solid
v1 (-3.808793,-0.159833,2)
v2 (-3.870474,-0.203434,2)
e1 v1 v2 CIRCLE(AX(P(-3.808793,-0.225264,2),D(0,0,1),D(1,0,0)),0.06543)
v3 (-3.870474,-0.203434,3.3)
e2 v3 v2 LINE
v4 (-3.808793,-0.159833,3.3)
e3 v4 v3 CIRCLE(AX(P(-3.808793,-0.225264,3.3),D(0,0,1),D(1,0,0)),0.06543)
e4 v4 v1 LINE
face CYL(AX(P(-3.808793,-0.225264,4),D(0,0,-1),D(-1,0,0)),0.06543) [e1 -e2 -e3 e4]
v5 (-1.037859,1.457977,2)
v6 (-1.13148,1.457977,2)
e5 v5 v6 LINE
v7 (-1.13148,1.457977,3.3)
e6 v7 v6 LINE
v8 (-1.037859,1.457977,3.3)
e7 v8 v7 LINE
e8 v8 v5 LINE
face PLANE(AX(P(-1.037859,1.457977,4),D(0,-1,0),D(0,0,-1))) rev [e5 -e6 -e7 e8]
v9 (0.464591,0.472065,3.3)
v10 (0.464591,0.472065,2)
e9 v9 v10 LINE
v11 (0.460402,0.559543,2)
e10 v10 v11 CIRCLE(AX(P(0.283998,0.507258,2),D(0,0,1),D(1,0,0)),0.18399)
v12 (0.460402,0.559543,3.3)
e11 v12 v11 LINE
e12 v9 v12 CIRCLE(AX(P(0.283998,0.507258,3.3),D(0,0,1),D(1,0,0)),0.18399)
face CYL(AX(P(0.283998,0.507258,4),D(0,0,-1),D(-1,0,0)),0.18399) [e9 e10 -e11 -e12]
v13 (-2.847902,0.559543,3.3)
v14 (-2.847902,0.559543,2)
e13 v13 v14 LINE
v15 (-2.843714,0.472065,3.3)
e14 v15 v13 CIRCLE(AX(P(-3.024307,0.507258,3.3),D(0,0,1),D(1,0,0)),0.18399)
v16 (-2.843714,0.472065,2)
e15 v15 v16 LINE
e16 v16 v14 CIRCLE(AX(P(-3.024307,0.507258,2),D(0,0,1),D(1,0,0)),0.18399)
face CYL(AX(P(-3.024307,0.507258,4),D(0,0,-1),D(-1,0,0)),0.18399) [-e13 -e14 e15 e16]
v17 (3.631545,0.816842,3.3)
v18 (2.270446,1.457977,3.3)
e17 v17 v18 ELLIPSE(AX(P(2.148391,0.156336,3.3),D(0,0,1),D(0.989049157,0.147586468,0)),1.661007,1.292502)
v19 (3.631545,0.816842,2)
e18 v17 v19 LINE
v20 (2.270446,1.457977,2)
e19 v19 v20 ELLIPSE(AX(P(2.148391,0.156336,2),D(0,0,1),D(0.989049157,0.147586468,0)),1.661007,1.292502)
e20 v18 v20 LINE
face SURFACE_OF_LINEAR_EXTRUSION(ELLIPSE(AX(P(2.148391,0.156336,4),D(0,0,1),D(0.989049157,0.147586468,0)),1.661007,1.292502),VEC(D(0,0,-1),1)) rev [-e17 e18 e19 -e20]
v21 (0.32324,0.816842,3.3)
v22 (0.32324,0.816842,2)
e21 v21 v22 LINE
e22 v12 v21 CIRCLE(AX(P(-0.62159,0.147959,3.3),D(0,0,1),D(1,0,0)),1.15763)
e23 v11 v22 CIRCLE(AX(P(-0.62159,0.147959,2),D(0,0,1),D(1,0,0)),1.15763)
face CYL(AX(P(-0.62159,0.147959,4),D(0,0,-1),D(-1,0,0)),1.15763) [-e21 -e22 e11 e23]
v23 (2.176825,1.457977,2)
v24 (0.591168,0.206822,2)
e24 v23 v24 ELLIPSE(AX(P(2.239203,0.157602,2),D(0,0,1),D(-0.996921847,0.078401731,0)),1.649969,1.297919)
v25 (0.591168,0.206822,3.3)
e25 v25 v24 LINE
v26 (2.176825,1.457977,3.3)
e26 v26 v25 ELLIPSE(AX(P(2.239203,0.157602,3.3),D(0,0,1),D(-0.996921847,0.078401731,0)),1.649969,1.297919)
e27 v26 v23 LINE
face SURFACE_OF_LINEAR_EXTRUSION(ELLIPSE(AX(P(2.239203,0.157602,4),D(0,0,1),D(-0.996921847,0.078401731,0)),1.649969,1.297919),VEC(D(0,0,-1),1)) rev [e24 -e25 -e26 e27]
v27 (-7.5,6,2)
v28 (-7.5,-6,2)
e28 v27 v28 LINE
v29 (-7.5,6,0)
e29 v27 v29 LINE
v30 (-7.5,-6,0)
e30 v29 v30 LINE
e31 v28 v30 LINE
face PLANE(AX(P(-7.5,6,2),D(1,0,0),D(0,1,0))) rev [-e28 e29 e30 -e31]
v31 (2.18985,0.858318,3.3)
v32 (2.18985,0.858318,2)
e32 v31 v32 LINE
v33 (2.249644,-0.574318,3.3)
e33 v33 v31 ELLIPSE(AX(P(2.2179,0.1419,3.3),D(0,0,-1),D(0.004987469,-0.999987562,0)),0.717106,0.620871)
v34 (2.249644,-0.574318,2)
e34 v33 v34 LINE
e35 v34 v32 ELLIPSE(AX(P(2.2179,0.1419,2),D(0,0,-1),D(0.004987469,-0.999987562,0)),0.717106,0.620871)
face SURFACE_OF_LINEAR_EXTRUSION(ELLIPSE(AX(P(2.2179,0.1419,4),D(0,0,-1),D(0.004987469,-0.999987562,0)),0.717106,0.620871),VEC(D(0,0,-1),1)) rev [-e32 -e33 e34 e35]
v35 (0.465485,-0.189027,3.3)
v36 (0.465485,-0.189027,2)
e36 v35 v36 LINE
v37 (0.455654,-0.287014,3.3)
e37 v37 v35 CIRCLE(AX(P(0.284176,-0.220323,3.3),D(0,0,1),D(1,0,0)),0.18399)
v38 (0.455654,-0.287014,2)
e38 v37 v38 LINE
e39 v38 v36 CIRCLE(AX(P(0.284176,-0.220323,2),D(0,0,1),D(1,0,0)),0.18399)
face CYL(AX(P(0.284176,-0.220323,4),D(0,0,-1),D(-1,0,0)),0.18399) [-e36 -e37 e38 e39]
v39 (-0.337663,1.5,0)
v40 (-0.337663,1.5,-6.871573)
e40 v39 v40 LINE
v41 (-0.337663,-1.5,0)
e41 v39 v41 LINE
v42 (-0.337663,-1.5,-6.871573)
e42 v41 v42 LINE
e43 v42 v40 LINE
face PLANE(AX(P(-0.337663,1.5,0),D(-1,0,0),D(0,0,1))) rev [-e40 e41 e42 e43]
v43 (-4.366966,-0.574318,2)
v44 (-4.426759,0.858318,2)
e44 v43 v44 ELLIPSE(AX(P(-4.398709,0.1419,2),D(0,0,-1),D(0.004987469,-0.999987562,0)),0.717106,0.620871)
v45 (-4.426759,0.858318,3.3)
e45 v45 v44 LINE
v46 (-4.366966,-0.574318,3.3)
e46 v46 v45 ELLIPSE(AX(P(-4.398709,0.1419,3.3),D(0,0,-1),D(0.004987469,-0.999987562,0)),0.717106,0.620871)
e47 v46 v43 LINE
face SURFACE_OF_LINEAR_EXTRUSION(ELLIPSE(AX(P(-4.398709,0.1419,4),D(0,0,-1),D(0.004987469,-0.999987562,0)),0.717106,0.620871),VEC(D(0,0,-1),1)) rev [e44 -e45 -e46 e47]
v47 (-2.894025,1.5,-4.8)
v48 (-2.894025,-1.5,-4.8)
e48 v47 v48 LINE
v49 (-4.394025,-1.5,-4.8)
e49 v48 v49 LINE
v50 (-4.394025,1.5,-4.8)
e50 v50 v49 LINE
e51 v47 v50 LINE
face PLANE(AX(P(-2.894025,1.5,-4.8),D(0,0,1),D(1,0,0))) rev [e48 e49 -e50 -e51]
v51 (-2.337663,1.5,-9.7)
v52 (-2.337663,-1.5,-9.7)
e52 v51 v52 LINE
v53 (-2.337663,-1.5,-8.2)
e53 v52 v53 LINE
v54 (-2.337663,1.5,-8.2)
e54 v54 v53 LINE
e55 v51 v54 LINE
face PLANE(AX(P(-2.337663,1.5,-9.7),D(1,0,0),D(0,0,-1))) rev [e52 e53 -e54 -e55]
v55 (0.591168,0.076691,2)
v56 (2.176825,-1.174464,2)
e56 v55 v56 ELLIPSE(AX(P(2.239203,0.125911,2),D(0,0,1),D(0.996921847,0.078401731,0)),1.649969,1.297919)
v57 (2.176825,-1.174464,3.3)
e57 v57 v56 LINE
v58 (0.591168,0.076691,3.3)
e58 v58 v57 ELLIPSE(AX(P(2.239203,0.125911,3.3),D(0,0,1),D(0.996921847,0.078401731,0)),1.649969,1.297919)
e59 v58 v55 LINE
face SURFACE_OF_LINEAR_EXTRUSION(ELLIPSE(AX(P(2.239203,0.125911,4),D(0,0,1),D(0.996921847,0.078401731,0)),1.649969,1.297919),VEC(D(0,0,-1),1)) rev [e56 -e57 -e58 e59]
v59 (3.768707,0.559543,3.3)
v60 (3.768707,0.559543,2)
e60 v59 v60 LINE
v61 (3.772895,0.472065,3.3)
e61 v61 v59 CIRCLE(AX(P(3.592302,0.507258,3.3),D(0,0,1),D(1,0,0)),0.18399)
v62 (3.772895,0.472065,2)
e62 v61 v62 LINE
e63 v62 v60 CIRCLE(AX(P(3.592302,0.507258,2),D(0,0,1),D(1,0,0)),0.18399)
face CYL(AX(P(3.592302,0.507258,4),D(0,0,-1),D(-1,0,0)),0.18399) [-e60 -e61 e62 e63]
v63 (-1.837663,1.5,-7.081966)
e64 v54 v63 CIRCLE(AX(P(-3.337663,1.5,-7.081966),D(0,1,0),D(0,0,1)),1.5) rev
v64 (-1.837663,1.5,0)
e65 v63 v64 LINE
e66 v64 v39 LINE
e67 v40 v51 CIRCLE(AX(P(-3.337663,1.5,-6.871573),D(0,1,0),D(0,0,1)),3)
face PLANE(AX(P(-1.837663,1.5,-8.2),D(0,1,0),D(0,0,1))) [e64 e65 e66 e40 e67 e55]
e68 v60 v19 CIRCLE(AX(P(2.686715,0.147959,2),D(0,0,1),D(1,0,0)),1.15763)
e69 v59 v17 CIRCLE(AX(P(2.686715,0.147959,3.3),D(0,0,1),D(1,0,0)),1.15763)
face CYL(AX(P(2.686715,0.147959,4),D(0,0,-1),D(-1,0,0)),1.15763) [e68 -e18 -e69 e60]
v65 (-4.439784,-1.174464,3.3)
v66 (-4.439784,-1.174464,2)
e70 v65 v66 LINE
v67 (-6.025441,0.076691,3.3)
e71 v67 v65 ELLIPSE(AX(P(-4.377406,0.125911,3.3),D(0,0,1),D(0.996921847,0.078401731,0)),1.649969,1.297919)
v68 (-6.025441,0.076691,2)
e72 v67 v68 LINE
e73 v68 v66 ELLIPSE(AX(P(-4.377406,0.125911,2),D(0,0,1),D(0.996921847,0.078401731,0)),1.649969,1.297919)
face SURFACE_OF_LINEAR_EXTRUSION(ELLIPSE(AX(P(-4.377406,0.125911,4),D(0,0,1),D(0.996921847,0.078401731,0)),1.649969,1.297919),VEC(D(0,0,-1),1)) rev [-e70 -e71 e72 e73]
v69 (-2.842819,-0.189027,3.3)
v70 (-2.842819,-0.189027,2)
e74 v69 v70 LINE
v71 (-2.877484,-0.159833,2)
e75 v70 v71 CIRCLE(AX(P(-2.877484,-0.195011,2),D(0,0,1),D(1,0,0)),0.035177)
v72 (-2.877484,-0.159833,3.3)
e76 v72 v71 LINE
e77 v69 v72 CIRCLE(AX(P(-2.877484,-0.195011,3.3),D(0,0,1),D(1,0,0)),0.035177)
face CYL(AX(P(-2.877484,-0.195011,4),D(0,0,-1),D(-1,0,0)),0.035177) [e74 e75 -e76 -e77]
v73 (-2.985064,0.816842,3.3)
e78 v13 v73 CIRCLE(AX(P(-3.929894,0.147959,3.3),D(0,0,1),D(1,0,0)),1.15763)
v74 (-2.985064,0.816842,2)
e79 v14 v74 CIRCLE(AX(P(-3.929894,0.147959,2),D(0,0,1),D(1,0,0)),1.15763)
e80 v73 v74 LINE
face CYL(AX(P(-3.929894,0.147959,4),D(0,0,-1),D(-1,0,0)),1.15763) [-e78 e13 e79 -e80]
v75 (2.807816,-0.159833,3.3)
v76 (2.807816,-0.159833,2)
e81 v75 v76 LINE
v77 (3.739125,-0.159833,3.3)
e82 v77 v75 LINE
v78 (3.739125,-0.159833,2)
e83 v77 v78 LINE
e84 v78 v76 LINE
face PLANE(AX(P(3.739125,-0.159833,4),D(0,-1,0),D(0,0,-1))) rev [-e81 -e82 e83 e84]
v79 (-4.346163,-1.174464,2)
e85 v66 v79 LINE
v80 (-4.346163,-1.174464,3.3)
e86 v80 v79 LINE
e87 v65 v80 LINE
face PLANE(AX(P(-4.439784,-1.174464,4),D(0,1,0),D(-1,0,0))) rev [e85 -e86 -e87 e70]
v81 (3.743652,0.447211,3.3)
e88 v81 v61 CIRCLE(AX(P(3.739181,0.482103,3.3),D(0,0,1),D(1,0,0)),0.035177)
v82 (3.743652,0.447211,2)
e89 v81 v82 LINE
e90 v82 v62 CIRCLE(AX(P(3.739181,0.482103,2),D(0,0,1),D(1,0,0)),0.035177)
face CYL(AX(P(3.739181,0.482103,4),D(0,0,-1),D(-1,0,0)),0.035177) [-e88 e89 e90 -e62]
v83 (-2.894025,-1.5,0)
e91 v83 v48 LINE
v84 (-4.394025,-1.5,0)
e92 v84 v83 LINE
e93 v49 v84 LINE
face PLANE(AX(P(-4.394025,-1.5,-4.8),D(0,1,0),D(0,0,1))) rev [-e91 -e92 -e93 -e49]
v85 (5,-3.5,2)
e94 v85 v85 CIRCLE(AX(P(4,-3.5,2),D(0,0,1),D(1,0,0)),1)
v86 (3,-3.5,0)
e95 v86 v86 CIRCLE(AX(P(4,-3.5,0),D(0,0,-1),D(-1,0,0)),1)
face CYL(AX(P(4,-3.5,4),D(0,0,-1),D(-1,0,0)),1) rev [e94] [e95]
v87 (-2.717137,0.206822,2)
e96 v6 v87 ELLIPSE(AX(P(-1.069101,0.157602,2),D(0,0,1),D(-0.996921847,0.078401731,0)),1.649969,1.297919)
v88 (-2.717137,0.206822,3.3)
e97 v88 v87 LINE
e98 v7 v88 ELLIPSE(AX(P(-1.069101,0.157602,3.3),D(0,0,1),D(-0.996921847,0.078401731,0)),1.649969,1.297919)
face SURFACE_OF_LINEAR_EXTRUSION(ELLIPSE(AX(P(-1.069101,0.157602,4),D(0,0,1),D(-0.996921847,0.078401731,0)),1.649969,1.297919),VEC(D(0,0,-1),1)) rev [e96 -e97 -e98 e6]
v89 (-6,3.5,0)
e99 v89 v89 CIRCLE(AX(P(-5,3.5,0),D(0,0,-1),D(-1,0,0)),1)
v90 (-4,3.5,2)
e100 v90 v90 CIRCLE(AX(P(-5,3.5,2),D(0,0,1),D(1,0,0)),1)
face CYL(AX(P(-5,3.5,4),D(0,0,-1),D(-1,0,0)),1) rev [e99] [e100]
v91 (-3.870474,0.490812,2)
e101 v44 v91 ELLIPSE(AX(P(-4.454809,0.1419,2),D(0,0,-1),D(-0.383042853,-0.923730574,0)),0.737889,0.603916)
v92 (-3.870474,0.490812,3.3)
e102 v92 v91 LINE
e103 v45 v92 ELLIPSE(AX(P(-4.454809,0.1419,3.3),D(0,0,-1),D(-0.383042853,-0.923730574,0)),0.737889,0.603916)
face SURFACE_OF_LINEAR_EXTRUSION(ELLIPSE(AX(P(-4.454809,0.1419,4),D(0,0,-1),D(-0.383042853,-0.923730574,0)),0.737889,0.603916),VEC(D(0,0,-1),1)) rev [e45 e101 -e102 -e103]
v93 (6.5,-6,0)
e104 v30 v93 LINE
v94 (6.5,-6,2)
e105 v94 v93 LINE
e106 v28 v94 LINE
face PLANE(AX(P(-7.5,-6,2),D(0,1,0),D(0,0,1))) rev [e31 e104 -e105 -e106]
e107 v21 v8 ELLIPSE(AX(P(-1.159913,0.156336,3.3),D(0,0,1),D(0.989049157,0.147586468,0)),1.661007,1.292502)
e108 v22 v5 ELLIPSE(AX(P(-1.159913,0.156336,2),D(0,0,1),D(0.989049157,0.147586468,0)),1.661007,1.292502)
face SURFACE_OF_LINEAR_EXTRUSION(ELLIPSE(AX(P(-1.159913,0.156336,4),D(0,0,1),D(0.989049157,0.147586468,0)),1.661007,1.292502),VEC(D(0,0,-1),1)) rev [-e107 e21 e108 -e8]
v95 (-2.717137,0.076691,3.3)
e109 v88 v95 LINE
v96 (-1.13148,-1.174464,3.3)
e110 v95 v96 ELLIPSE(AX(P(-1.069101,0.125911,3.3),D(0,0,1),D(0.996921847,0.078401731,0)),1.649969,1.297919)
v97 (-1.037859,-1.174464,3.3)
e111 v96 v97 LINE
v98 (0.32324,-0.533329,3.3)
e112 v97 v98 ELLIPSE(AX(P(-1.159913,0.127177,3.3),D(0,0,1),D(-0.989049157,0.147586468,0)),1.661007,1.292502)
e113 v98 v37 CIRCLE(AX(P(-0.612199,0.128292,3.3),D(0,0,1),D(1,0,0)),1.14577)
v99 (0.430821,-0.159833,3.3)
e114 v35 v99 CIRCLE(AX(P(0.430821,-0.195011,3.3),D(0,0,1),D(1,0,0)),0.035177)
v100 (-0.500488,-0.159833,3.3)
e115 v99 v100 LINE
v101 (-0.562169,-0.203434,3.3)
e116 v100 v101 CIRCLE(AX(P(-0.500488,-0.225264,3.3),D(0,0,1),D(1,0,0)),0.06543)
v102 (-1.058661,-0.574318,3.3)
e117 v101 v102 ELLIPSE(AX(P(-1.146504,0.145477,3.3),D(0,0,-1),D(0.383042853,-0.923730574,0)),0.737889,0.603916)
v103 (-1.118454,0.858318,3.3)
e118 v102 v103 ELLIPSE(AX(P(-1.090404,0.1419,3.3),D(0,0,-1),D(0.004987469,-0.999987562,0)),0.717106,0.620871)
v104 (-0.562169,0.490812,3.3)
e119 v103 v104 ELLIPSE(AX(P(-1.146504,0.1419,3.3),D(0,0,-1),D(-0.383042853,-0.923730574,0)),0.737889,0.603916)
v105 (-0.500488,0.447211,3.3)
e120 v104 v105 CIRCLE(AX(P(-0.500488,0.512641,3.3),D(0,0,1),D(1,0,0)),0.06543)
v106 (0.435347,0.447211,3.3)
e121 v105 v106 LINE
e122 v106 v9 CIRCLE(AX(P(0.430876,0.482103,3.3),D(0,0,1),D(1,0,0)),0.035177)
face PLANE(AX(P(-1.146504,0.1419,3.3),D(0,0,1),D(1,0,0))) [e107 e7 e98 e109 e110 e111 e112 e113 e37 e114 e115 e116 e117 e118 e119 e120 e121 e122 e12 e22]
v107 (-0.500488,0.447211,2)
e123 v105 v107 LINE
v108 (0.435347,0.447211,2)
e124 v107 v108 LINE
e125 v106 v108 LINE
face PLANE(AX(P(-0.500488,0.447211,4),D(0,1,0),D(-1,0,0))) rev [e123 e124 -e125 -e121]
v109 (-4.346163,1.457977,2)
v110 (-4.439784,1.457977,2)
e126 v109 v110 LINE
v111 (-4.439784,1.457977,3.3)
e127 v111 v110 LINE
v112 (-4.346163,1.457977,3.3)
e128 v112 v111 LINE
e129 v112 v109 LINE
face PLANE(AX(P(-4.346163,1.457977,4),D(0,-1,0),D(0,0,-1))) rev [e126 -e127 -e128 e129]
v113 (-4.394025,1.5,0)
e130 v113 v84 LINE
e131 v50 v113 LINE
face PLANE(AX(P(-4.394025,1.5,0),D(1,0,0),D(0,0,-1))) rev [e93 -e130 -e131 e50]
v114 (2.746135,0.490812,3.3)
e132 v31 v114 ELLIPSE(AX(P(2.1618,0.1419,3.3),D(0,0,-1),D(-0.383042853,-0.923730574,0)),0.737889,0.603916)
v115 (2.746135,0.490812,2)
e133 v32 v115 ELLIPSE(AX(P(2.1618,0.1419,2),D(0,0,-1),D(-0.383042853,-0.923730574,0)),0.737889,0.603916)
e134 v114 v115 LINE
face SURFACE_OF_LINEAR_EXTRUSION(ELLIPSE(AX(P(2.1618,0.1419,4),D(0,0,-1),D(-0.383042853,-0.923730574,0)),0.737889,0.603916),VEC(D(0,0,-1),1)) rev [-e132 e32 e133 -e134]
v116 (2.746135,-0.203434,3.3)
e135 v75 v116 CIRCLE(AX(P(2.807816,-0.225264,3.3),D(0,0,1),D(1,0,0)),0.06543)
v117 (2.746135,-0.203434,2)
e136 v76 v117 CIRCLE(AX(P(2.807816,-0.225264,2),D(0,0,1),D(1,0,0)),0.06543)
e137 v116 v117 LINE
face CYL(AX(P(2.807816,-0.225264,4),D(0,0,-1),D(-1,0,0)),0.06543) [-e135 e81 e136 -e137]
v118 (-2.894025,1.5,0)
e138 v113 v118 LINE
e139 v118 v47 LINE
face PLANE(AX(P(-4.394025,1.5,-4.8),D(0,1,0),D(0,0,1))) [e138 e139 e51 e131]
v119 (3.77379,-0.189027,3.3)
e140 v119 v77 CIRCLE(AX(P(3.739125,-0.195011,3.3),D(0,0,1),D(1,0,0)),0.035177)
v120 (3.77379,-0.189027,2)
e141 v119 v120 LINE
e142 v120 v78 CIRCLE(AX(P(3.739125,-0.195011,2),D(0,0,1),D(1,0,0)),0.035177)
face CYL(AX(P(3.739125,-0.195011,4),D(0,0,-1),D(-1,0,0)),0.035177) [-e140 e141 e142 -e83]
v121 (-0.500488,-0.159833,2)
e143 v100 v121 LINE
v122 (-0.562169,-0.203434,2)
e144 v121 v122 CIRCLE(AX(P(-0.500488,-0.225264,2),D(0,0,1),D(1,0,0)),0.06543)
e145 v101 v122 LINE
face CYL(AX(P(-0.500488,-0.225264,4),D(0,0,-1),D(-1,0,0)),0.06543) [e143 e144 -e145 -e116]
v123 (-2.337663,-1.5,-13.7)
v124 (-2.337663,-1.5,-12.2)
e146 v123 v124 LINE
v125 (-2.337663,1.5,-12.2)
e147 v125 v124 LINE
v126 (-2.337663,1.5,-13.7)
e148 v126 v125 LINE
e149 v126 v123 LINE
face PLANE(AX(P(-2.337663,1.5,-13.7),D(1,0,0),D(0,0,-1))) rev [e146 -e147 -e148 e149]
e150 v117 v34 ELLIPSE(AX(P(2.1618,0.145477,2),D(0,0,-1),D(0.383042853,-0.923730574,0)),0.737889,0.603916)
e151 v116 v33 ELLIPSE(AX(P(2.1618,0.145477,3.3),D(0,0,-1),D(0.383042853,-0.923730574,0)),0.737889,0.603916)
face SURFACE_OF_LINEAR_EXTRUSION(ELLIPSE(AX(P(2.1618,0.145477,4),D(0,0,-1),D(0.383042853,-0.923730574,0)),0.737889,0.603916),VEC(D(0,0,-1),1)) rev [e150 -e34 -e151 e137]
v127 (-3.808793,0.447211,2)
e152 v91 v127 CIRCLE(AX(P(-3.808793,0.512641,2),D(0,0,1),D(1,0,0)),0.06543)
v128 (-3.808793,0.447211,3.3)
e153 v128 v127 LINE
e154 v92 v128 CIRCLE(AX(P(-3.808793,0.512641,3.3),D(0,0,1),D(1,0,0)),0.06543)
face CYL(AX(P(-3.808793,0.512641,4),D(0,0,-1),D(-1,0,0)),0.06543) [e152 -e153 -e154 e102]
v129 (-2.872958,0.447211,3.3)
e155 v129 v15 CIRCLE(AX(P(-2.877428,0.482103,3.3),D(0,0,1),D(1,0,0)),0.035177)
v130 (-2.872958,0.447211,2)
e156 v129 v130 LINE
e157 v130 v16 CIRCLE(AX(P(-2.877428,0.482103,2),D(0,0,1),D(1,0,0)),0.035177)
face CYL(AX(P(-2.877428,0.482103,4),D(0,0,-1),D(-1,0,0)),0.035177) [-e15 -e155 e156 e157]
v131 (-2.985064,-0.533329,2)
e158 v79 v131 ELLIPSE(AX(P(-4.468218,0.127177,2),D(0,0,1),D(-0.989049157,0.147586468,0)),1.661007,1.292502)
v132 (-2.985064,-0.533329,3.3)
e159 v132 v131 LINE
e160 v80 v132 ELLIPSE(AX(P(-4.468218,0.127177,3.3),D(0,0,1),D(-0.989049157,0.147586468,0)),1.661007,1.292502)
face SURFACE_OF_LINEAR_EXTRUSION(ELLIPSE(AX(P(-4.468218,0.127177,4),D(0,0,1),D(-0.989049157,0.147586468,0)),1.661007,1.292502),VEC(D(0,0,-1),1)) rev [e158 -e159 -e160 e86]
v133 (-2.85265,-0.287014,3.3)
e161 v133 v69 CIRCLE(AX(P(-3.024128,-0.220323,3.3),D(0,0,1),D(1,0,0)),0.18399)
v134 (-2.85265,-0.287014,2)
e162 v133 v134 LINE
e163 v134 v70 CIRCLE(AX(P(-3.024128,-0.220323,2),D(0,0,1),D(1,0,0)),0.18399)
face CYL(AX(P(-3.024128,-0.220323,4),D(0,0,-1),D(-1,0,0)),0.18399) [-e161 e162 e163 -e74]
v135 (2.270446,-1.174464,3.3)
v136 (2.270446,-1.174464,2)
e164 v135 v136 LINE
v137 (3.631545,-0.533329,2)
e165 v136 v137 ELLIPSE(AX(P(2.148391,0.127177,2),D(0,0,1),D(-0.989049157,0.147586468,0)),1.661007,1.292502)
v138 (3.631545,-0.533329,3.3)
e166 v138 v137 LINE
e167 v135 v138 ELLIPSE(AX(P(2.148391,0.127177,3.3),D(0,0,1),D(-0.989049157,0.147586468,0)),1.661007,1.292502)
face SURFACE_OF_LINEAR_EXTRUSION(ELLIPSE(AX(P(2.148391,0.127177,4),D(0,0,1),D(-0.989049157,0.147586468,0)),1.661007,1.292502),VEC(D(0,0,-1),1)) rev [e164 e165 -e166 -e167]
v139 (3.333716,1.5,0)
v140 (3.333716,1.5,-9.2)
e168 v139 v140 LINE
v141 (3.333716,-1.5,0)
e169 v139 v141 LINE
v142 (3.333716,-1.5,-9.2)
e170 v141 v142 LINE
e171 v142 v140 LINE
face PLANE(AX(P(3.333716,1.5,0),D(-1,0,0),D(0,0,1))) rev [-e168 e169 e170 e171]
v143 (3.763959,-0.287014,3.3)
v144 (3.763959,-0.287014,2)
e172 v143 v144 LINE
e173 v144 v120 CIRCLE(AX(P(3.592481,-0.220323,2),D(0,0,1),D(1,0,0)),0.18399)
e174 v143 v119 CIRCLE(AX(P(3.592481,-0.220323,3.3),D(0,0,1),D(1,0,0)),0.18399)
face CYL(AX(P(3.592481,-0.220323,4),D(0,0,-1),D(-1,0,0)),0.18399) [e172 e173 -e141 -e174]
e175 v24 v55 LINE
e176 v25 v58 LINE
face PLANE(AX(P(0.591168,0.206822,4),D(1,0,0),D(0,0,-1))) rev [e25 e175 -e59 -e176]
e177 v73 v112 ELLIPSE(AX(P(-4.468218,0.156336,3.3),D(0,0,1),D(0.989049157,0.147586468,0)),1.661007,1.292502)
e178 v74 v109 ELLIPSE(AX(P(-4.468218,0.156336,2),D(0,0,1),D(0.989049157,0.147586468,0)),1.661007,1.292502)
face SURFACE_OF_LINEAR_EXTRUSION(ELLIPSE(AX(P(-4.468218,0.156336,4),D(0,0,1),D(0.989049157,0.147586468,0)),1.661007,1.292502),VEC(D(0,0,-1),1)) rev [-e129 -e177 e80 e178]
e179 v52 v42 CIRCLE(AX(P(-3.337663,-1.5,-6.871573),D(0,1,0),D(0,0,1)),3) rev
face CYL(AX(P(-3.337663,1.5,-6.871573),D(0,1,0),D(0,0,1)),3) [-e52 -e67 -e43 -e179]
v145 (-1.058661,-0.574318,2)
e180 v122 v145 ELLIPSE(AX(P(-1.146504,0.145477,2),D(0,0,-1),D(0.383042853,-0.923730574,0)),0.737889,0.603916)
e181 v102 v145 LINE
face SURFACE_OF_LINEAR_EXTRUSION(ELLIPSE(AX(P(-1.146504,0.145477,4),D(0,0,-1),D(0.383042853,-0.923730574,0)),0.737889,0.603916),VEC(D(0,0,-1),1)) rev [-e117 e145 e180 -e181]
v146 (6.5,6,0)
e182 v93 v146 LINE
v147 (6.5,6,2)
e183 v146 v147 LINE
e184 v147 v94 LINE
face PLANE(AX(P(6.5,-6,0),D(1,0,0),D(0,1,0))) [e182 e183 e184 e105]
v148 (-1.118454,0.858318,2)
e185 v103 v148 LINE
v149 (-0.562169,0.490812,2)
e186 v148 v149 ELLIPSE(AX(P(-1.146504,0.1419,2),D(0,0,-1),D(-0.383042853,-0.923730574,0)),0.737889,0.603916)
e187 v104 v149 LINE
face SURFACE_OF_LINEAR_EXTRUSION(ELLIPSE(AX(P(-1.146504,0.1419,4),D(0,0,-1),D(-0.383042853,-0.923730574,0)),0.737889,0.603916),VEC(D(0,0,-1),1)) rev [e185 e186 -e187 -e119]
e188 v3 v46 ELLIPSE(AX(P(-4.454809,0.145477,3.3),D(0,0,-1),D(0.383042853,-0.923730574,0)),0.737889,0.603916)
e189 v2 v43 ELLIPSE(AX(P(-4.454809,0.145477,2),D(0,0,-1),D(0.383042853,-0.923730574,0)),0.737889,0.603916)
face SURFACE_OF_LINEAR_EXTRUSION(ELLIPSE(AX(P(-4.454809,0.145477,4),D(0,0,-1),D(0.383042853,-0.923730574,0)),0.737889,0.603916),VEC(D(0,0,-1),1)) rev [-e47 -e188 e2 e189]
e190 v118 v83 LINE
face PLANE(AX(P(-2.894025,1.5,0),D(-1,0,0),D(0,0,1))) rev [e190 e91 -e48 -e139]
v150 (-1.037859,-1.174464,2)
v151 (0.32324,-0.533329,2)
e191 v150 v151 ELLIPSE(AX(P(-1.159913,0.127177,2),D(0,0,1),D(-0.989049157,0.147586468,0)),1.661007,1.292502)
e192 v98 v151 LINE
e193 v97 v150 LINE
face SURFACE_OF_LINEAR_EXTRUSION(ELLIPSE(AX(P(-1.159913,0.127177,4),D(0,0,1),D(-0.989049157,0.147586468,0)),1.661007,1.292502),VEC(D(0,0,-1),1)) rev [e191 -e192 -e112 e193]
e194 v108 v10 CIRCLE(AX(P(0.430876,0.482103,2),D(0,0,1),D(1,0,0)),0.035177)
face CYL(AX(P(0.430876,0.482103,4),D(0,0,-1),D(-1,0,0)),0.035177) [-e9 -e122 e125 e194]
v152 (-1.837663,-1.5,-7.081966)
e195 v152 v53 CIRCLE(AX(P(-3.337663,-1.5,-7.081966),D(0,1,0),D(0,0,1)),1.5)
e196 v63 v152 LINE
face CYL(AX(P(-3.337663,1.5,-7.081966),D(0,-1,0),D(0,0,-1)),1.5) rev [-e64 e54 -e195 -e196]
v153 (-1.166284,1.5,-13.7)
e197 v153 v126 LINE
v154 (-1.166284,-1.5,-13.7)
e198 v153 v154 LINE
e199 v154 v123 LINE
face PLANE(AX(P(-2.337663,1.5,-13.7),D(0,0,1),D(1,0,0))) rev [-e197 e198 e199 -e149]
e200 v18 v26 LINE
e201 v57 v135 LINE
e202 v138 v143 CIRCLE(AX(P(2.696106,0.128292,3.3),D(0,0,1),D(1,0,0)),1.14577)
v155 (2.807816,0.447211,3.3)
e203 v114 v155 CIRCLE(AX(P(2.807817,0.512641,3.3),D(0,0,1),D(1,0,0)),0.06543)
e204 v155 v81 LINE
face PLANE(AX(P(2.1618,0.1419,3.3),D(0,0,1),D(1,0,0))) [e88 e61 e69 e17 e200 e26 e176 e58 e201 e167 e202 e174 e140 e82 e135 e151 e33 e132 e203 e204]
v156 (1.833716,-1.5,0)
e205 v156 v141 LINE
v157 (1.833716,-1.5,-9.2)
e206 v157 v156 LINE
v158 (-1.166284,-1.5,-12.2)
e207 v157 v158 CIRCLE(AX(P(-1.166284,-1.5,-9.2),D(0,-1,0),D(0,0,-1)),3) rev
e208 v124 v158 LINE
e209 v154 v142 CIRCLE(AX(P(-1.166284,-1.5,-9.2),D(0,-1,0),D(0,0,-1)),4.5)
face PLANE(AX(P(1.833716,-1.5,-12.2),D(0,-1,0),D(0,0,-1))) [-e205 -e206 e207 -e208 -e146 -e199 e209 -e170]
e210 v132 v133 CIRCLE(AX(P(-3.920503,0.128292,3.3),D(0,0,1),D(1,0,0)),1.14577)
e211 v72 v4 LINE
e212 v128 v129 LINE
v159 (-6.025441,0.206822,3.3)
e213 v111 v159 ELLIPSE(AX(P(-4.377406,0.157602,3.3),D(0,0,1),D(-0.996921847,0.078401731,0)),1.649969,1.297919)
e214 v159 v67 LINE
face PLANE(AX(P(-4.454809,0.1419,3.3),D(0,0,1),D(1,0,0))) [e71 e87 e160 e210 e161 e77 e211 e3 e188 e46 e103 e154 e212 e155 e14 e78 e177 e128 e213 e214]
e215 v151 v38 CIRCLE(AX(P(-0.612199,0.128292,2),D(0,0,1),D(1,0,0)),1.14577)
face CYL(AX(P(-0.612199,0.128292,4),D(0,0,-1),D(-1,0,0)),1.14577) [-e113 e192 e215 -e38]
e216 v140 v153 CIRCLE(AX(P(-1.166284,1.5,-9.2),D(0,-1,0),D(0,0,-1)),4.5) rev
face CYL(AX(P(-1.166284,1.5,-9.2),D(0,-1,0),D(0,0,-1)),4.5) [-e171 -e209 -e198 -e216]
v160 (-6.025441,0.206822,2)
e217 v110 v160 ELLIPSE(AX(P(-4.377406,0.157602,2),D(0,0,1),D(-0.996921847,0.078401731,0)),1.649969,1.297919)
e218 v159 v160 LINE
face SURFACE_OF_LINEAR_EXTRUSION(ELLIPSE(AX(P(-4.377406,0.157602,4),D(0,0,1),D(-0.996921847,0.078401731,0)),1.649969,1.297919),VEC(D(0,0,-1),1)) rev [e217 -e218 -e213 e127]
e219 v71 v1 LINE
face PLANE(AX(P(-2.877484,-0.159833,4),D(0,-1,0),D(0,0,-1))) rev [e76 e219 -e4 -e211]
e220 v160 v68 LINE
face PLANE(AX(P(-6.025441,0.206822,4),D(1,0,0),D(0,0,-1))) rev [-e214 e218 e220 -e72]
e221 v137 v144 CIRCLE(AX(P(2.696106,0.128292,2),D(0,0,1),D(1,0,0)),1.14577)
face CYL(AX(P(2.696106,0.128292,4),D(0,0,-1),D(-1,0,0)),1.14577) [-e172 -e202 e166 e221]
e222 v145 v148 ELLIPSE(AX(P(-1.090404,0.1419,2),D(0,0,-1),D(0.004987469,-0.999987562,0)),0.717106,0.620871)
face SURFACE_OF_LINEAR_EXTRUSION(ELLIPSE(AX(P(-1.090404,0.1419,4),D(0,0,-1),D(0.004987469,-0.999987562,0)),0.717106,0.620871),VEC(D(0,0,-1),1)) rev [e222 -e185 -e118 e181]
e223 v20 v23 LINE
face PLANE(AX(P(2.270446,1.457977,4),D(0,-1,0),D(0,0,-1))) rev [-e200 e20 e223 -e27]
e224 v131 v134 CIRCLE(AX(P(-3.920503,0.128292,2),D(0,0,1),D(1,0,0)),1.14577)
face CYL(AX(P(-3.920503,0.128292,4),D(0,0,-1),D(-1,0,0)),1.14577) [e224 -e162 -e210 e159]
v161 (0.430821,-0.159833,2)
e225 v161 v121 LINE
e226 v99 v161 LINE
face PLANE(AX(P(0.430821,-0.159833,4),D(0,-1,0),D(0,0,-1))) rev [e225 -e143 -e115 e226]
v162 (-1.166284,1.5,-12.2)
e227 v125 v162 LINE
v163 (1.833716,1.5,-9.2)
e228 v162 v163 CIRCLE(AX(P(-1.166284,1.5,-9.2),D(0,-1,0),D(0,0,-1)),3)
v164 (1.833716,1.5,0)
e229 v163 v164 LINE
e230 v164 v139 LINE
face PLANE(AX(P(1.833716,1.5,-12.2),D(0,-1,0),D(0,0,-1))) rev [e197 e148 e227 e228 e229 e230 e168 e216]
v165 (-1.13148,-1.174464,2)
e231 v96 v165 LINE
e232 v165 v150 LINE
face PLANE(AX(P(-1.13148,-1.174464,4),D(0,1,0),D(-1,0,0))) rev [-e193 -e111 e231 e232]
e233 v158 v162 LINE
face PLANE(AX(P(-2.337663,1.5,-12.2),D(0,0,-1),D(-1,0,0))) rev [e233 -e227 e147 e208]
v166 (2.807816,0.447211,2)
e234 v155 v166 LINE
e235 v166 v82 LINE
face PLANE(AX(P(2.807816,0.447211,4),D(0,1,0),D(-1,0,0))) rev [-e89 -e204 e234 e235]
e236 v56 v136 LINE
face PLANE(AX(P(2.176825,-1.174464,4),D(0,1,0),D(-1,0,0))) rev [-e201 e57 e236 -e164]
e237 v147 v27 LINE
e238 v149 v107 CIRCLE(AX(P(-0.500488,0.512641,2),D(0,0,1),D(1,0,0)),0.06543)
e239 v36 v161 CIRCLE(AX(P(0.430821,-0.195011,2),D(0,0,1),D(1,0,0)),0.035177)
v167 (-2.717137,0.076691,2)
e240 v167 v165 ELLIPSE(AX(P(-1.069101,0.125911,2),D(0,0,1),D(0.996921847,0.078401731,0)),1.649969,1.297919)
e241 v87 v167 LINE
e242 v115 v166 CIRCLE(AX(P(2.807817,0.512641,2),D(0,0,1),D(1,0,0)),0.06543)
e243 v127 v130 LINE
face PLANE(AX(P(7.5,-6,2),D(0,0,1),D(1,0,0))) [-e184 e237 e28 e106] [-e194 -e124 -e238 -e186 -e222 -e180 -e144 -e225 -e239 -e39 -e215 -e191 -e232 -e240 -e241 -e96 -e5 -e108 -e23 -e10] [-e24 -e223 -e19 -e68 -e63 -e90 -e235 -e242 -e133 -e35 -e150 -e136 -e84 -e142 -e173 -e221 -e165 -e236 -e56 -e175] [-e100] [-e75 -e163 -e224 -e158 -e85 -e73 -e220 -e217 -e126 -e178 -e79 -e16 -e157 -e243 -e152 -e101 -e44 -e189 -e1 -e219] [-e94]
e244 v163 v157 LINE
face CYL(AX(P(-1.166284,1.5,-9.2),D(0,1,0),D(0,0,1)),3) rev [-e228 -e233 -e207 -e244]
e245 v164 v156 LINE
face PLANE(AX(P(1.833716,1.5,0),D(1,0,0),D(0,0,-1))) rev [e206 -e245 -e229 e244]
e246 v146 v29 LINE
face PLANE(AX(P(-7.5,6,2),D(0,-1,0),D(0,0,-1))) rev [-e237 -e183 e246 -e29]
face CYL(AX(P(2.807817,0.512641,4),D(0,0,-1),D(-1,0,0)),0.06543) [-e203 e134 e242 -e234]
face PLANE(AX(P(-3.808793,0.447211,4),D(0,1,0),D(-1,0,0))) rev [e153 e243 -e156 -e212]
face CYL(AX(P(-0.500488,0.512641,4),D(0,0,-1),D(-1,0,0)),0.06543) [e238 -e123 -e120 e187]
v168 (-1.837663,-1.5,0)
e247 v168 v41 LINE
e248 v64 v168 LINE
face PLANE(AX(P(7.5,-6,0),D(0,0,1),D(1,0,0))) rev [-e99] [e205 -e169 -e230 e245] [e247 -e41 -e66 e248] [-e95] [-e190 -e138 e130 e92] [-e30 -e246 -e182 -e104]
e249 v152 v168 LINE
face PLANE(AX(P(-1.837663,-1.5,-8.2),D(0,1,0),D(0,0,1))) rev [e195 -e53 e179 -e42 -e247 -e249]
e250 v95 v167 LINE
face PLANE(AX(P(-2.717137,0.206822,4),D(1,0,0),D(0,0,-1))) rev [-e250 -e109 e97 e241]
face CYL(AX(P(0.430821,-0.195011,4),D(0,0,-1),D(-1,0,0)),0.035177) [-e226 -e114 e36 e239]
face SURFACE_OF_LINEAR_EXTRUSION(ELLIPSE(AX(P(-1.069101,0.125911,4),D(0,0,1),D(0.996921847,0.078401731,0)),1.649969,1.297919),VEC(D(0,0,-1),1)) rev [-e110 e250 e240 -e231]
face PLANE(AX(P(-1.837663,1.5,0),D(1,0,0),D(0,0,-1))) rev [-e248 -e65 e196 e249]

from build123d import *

# Parameters (mm, degrees)
SKETCH1_W           = 15
SKETCH1_H           = 12
BOSS_EXTRUDE1_DEPTH = 2
BOSS_EXTRUDE2_DEPTH = 2
SKETCH3_W           = 1.5
SKETCH3_H           = 4.8
BOSS_EXTRUDE3_DEPTH = 1.5
FILLET3_START       = -1.5
FILLET3_DEPTH       = 3
FILLET4_R           = 3
FILLET5_R           = 3
FILLET6_R           = 4.5
SKETCH4_W           = 2
SKETCH4_H           = 12
CUT_EXTRUDE1_DEPTH  = 1
SKETCH5_R           = 1
CUT_EXTRUDE2_DEPTH  = 17.731407672
CUT_EXTRUDE3_START  = -0.7
CUT_EXTRUDE3_DEPTH  = 0.7


with BuildPart() as part:
    # Sketch1 → Boss-Extrude1 (new body)
    with BuildSketch(Plane.XY):
        Rectangle(SKETCH1_W, SKETCH1_H)
    extrude(amount=BOSS_EXTRUDE1_DEPTH)

    # Sketch2 → Boss-Extrude2 (add)
    with BuildSketch(Plane.XY.offset(2)):
        with BuildLine():
            Line((-0.500488048, 0.447210694), (0.435347045, 0.447210694))
            ThreePointArc((0.435347045, 0.447210694), (0.453657173, 0.45529852), (0.464590943, 0.472065344))
            ThreePointArc((0.464590943, 0.472065344), (0.467777397, 0.516057125), (0.460402384, 0.559543208))
            ThreePointArc((0.460402384, 0.559543208), (0.399954535, 0.692528449), (0.323240273, 0.816842321))
            add(Edge.make_bspline(
                [(0.323240273, 0.816842321), (-0.095057279, 1.457976678), (-1.037858727, 1.457976694)],
                knots=[0.342748392, 0.342748392, 0.342748392, 1.381331674, 1.381331674, 1.381331674], degree=2, weights=[1, 0.868170932, 1]))
            Line((-1.037858727, 1.457976694), (-1.131479815, 1.457976694))
            add(Edge.make_bspline(
                [(-1.131479815, 1.457976694), (-2.717136663, 1.457976694), (-2.717136676, 0.206821629)],
                knots=[4.81203319, 4.81203319, 4.81203319, 6.344970318, 6.344970318, 6.344970318], degree=2, weights=[1, 0.720364545, 1]))
            Line((-2.717136676, 0.206821629), (-2.717136676, 0.076691364))
            add(Edge.make_bspline(
                [(-2.717136676, 0.076691364), (-2.717136676, -1.174463735), (-1.131479784, -1.174463712)],
                knots=[3.079807634, 3.079807634, 3.079807634, 4.61274479, 4.61274479, 4.61274479], degree=2, weights=[1, 0.720364535, 1]))
            Line((-1.131479784, -1.174463712), (-1.037858761, -1.174463712))
            add(Edge.make_bspline(
                [(-1.037858761, -1.174463712), (-0.095057289, -1.174463712), (0.323240273, -0.533329339)],
                knots=[1.760260959, 1.760260959, 1.760260959, 2.798844261, 2.798844261, 2.798844261], degree=2, weights=[1, 0.868170926, 1]))
            ThreePointArc((0.323240273, -0.533329339), (0.396990367, -0.414226505), (0.455654338, -0.287013692))
            ThreePointArc((0.455654338, -0.287013692), (0.467247325, -0.238690378), (0.465485217, -0.189027163))
            ThreePointArc((0.465485217, -0.189027163), (0.453480667, -0.168104183), (0.430820669, -0.159833461))
            Line((0.430820669, -0.159833461), (-0.50048808, -0.159833461))
            ThreePointArc((-0.50048808, -0.159833461), (-0.53825591, -0.17183426), (-0.562169449, -0.203434431))
            add(Edge.make_bspline(
                [(-1.058661028, -0.574317984), (-0.693553117, -0.574677188), (-0.562169449, -0.203434431)],
                knots=[5.955155363, 5.955155363, 5.955155363, 7.020735544, 7.020735544, 7.020735544], degree=2, weights=[1, 0.86139323, 1]))
            add(Edge.make_bspline(
                [(-1.118454184, 0.858318186), (-1.740543918, 0.826860552), (-1.710558048, 0.108403064), (-1.680572179, -0.610054424), (-1.058661028, -0.574317984)],
                knots=[3.181025595, 3.181025595, 3.181025595, 4.754799698, 4.754799698, 6.328573801, 6.328573801, 6.328573801], degree=2, weights=[1, 0.706053195, 1, 0.706053195, 1]))
            add(Edge.make_bspline(
                [(-0.562169449, 0.490811684), (-0.70840827, 0.904029734), (-1.118454184, 0.858318186)],
                knots=[2.404042417, 2.404042417, 2.404042417, 3.565685694, 3.565685694, 3.565685694], degree=2, weights=[1, 0.83601209, 1]))
            ThreePointArc((-0.562169449, 0.490811684), (-0.538255894, 0.459211502), (-0.500488048, 0.447210694))
        make_face()
        with BuildLine():
            Line((-3.808792647, 0.447210694), (-2.872957501, 0.447210694))
            ThreePointArc((-2.872957501, 0.447210694), (-2.854647373, 0.45529852), (-2.843713602, 0.472065344))
            ThreePointArc((-2.843713602, 0.472065344), (-2.840527149, 0.516057125), (-2.847902161, 0.559543208))
            ThreePointArc((-2.847902161, 0.559543208), (-2.90835001, 0.692528449), (-2.985064272, 0.816842321))
            add(Edge.make_bspline(
                [(-2.985064272, 0.816842321), (-3.403361825, 1.457976679), (-4.346163273, 1.457976694)],
                knots=[0.342748392, 0.342748392, 0.342748392, 1.381331674, 1.381331674, 1.381331674], degree=2, weights=[1, 0.868170932, 1]))
            Line((-4.346163273, 1.457976694), (-4.43978436, 1.457976694))
            add(Edge.make_bspline(
                [(-4.43978436, 1.457976694), (-6.025441208, 1.457976694), (-6.025441222, 0.206821629)],
                knots=[4.81203319, 4.81203319, 4.81203319, 6.344970318, 6.344970318, 6.344970318], degree=2, weights=[1, 0.720364545, 1]))
            Line((-6.025441222, 0.206821629), (-6.025441222, 0.076691364))
            add(Edge.make_bspline(
                [(-6.025441222, 0.076691364), (-6.025441222, -1.174463735), (-4.439784331, -1.174463712)],
                knots=[6.221400287, 6.221400287, 6.221400287, 7.754337442, 7.754337442, 7.754337442], degree=2, weights=[1, 0.720364536, 1]))
            Line((-4.439784331, -1.174463712), (-4.346163307, -1.174463712))
            add(Edge.make_bspline(
                [(-4.346163307, -1.174463712), (-3.403361835, -1.174463712), (-2.985064272, -0.533329339)],
                knots=[1.760260959, 1.760260959, 1.760260959, 2.798844261, 2.798844261, 2.798844261], degree=2, weights=[1, 0.868170926, 1]))
            ThreePointArc((-2.985064272, -0.533329339), (-2.911314179, -0.414226505), (-2.852650208, -0.287013692))
            ThreePointArc((-2.852650208, -0.287013692), (-2.84105722, -0.238690378), (-2.842819329, -0.189027163))
            ThreePointArc((-2.842819329, -0.189027163), (-2.854823879, -0.168104182), (-2.877483878, -0.159833461))
            Line((-2.877483878, -0.159833461), (-3.808792626, -0.159833461))
            ThreePointArc((-3.808792626, -0.159833461), (-3.846560455, -0.17183426), (-3.870473995, -0.203434431))
            add(Edge.make_bspline(
                [(-4.366965573, -0.574317984), (-4.001857663, -0.574677188), (-3.870473995, -0.203434431)],
                knots=[2.81356271, 2.81356271, 2.81356271, 3.87914289, 3.87914289, 3.87914289], degree=2, weights=[1, 0.86139323, 1]))
            add(Edge.make_bspline(
                [(-4.42675873, 0.858318186), (-5.048848463, 0.826860552), (-5.018862594, 0.108403064), (-4.988876725, -0.610054424), (-4.366965573, -0.574317984)],
                knots=[3.181025595, 3.181025595, 3.181025595, 4.754799698, 4.754799698, 6.328573801, 6.328573801, 6.328573801], degree=2, weights=[1, 0.706053195, 1, 0.706053195, 1]))
            add(Edge.make_bspline(
                [(-3.870473995, 0.490811684), (-4.016712815, 0.904029734), (-4.42675873, 0.858318186)],
                knots=[5.54563507, 5.54563507, 5.54563507, 6.707278348, 6.707278348, 6.707278348], degree=2, weights=[1, 0.83601209, 1]))
            ThreePointArc((-3.870473995, 0.490811684), (-3.846560461, 0.459211518), (-3.808792647, 0.447210694))
        make_face()
        with BuildLine():
            Line((2.807816498, 0.447210694), (3.743651591, 0.447210694))
            ThreePointArc((3.743651591, 0.447210694), (3.761961719, 0.45529852), (3.772895489, 0.472065344))
            ThreePointArc((3.772895489, 0.472065344), (3.776081943, 0.516057125), (3.76870693, 0.559543208))
            ThreePointArc((3.76870693, 0.559543208), (3.708259081, 0.692528449), (3.631544819, 0.816842321))
            add(Edge.make_bspline(
                [(3.631544819, 0.816842321), (3.213247267, 1.457976678), (2.270445819, 1.457976694)],
                knots=[0.342748392, 0.342748392, 0.342748392, 1.381331674, 1.381331674, 1.381331674], degree=2, weights=[1, 0.868170932, 1]))
            Line((2.270445819, 1.457976694), (2.176824731, 1.457976694))
            add(Edge.make_bspline(
                [(2.176824731, 1.457976694), (0.591167883, 1.457976694), (0.59116787, 0.206821629)],
                knots=[4.81203319, 4.81203319, 4.81203319, 6.344970318, 6.344970318, 6.344970318], degree=2, weights=[1, 0.720364545, 1]))
            Line((0.59116787, 0.206821629), (0.59116787, 0.076691364))
            add(Edge.make_bspline(
                [(0.59116787, 0.076691364), (0.59116787, -1.174463735), (2.176824762, -1.174463712)],
                knots=[3.079807634, 3.079807634, 3.079807634, 4.61274479, 4.61274479, 4.61274479], degree=2, weights=[1, 0.720364535, 1]))
            Line((2.176824762, -1.174463712), (2.270445785, -1.174463712))
            add(Edge.make_bspline(
                [(2.270445785, -1.174463712), (3.213247257, -1.174463712), (3.631544819, -0.533329339)],
                knots=[1.760260959, 1.760260959, 1.760260959, 2.798844261, 2.798844261, 2.798844261], degree=2, weights=[1, 0.868170926, 1]))
            ThreePointArc((3.631544819, -0.533329339), (3.705294913, -0.414226505), (3.763958884, -0.287013692))
            ThreePointArc((3.763958884, -0.287013692), (3.775551871, -0.238690378), (3.773789763, -0.189027163))
            ThreePointArc((3.773789763, -0.189027163), (3.761785213, -0.168104183), (3.739125215, -0.159833461))
            Line((3.739125215, -0.159833461), (2.807816466, -0.159833461))
            ThreePointArc((2.807816466, -0.159833461), (2.770048636, -0.17183426), (2.746135097, -0.203434431))
            add(Edge.make_bspline(
                [(2.249643518, -0.574317984), (2.614751429, -0.574677188), (2.746135097, -0.203434431)],
                knots=[2.81356271, 2.81356271, 2.81356271, 3.87914289, 3.87914289, 3.87914289], degree=2, weights=[1, 0.86139323, 1]))
            add(Edge.make_bspline(
                [(2.189850362, 0.858318186), (1.567760628, 0.826860552), (1.597746498, 0.108403064), (1.627732367, -0.610054424), (2.249643518, -0.574317984)],
                knots=[0.039432941, 0.039432941, 0.039432941, 1.613207044, 1.613207044, 3.186981147, 3.186981147, 3.186981147], degree=2, weights=[1, 0.706053195, 1, 0.706053195, 1]))
            add(Edge.make_bspline(
                [(2.746135097, 0.490811684), (2.599896276, 0.904029734), (2.189850362, 0.858318186)],
                knots=[2.404042417, 2.404042417, 2.404042417, 3.565685694, 3.565685694, 3.565685694], degree=2, weights=[1, 0.83601209, 1]))
            ThreePointArc((2.746135097, 0.490811684), (2.770048652, 0.459211502), (2.807816498, 0.447210694))
        make_face()
    extrude(amount=BOSS_EXTRUDE2_DEPTH)

    # Sketch3 → Boss-Extrude3 (add, symmetric)
    with BuildSketch(Plane(origin=(0, 0, 0), x_dir=(1, 0, 0), z_dir=(0, 1, 0))):
        Polygon((1.833716, 0), (3.333716, 0), (3.333716, 13.7), (-2.337662633, 13.7), (-2.337662633, 12.2), (1.833716, 12.2), align=None)
        with Locations((-3.644025381, 2.4)):
            Rectangle(SKETCH3_W, SKETCH3_H)
        Polygon((-1.837662633, 0), (-0.337662633, 0), (-0.337662633, 9.7), (-2.337662633, 9.7), (-2.337662633, 8.2), (-1.837662633, 8.2), align=None)
    extrude(amount=BOSS_EXTRUDE3_DEPTH, both=True)

    # Fillet3: read off the stored shape, not the designer's step
    # Fillet3 outline → Fillet3 (add)
    with BuildSketch(Plane(origin=(0, 0, 0), x_dir=(1, 0, 0), z_dir=(0, 1, 0)).offset(FILLET3_START)):
        with BuildLine():
            Line((-1.837662633, 8.2), (-2.337662633, 8.2))
            ThreePointArc((-2.337662633, 8.2), (-1.968356239, 7.694338447), (-1.837662633, 7.081966011))
            Line((-1.837662633, 7.081966011), (-1.837662633, 8.2))
        make_face()
    extrude(amount=FILLET3_DEPTH)

    # Fillet4
    # the kernel refuses this fillet: 3 mm, written as the material it takes off along each edge
    with BuildSketch(Plane(origin=(-0.337662633, -8.571067812, -9.7), x_dir=(0, 0, 1), z_dir=(0, 1, 0))) as fillet4_piece_1:
        with BuildLine():
            CenterArc((2.828427125, -3), FILLET4_R, 90, 70.528779366)
            Line((0, -2), (-0.056568542, -1.98))
            ThreePointArc((-0.056568542, -1.98), (-0.06, -1), (-0.06, 0))
            Line((-0.06, 0), (0, 0.06))
            Line((0, 0.06), (2.828427125, 0.06))
            Line((2.828427125, 0.06), (2.828427125, 0))
        make_face()
    extrude(amount=17.142135624, mode=Mode.SUBTRACT)

    # Fillet5
    fillet5_edges = [part.edges().sort_by_distance(p)[0] for p in [
        (1.833716, 0, -12.2),
    ]]
    fillet(fillet5_edges, radius=FILLET5_R)

    # Fillet6
    fillet6_edges = [part.edges().sort_by_distance(p)[0] for p in [
        (3.333716, 0, -13.7),
    ]]
    fillet(fillet6_edges, radius=FILLET6_R)

    # Sketch4 → Cut-Extrude1 (cut)
    with BuildSketch(Plane(origin=(7.5, 0, 0), x_dir=(0, 0, -1), z_dir=(1, 0, 0))):
        with Locations((-1, 0)):
            Rectangle(SKETCH4_W, SKETCH4_H)
    extrude(amount=-CUT_EXTRUDE1_DEPTH, mode=Mode.SUBTRACT)

    # Sketch5 → Cut-Extrude2 (cut, through all)
    with BuildSketch(Plane(origin=(0, 0, 0), x_dir=(-1, 0, 0), z_dir=(0, 0, -1))):
        with Locations((-4, -3.5)):
            Circle(SKETCH5_R)
        with Locations((5, 3.5)):
            Circle(SKETCH5_R)
    extrude(amount=-CUT_EXTRUDE2_DEPTH, mode=Mode.SUBTRACT)

    # Sketch6 → Cut-Extrude3 (cut)
    with BuildSketch(Plane.XY.offset(4).offset(CUT_EXTRUDE3_START)):
        with BuildLine():
            Line((-3.808792647, 0.447210694), (-2.872957501, 0.447210694))
            ThreePointArc((-2.872957501, 0.447210694), (-2.854647373, 0.45529852), (-2.843713602, 0.472065344))
            ThreePointArc((-2.843713602, 0.472065344), (-2.840527149, 0.516057125), (-2.847902161, 0.559543208))
            ThreePointArc((-2.847902161, 0.559543208), (-2.90835001, 0.692528449), (-2.985064272, 0.816842321))
            add(Edge.make_bspline(
                [(-2.985064272, 0.816842321), (-3.403361825, 1.457976679), (-4.346163273, 1.457976694)],
                knots=[0.342748392, 0.342748392, 0.342748392, 1.381331674, 1.381331674, 1.381331674], degree=2, weights=[1, 0.868170932, 1]))
            Line((-4.346163273, 1.457976694), (-4.43978436, 1.457976694))
            add(Edge.make_bspline(
                [(-4.43978436, 1.457976694), (-6.025441208, 1.457976694), (-6.025441222, 0.206821629)],
                knots=[4.81203319, 4.81203319, 4.81203319, 6.344970318, 6.344970318, 6.344970318], degree=2, weights=[1, 0.720364545, 1]))
            Line((-6.025441222, 0.206821629), (-6.025441222, 0.076691364))
            add(Edge.make_bspline(
                [(-6.025441222, 0.076691364), (-6.025441222, -1.174463735), (-4.439784331, -1.174463712)],
                knots=[6.221400287, 6.221400287, 6.221400287, 7.754337442, 7.754337442, 7.754337442], degree=2, weights=[1, 0.720364536, 1]))
            Line((-4.439784331, -1.174463712), (-4.346163307, -1.174463712))
            add(Edge.make_bspline(
                [(-4.346163307, -1.174463712), (-3.403361835, -1.174463712), (-2.985064272, -0.533329339)],
                knots=[1.760260959, 1.760260959, 1.760260959, 2.798844261, 2.798844261, 2.798844261], degree=2, weights=[1, 0.868170926, 1]))
            ThreePointArc((-2.985064272, -0.533329339), (-2.911314179, -0.414226505), (-2.852650208, -0.287013692))
            ThreePointArc((-2.852650208, -0.287013692), (-2.84105722, -0.238690378), (-2.842819329, -0.189027163))
            ThreePointArc((-2.842819329, -0.189027163), (-2.854823879, -0.168104182), (-2.877483878, -0.159833461))
            Line((-2.877483878, -0.159833461), (-3.808792626, -0.159833461))
            ThreePointArc((-3.808792626, -0.159833461), (-3.846560455, -0.17183426), (-3.870473995, -0.203434431))
            add(Edge.make_bspline(
                [(-4.366965573, -0.574317984), (-4.001857663, -0.574677188), (-3.870473995, -0.203434431)],
                knots=[5.955155363, 5.955155363, 5.955155363, 7.020735544, 7.020735544, 7.020735544], degree=2, weights=[1, 0.86139323, 1]))
            add(Edge.make_bspline(
                [(-4.42675873, 0.858318186), (-5.048848463, 0.826860552), (-5.018862594, 0.108403064), (-4.988876725, -0.610054424), (-4.366965573, -0.574317984)],
                knots=[3.181025595, 3.181025595, 3.181025595, 4.754799698, 4.754799698, 6.328573801, 6.328573801, 6.328573801], degree=2, weights=[1, 0.706053195, 1, 0.706053195, 1]))
            add(Edge.make_bspline(
                [(-3.870473995, 0.490811684), (-4.016712815, 0.904029734), (-4.42675873, 0.858318186)],
                knots=[2.404042417, 2.404042417, 2.404042417, 3.565685694, 3.565685694, 3.565685694], degree=2, weights=[1, 0.83601209, 1]))
            ThreePointArc((-3.870473995, 0.490811684), (-3.846560461, 0.459211518), (-3.808792647, 0.447210694))
        make_face()
        with BuildLine():
            Line((-0.500488048, 0.447210694), (0.435347045, 0.447210694))
            ThreePointArc((0.435347045, 0.447210694), (0.453657173, 0.45529852), (0.464590943, 0.472065344))
            ThreePointArc((0.464590943, 0.472065344), (0.467777397, 0.516057125), (0.460402384, 0.559543208))
            ThreePointArc((0.460402384, 0.559543208), (0.399954535, 0.692528449), (0.323240273, 0.816842321))
            add(Edge.make_bspline(
                [(0.323240273, 0.816842321), (-0.095057279, 1.457976678), (-1.037858727, 1.457976694)],
                knots=[0.342748392, 0.342748392, 0.342748392, 1.381331674, 1.381331674, 1.381331674], degree=2, weights=[1, 0.868170932, 1]))
            Line((-1.037858727, 1.457976694), (-1.131479815, 1.457976694))
            add(Edge.make_bspline(
                [(-1.131479815, 1.457976694), (-2.717136663, 1.457976694), (-2.717136676, 0.206821629)],
                knots=[4.81203319, 4.81203319, 4.81203319, 6.344970318, 6.344970318, 6.344970318], degree=2, weights=[1, 0.720364545, 1]))
            Line((-2.717136676, 0.206821629), (-2.717136676, 0.076691364))
            add(Edge.make_bspline(
                [(-2.717136676, 0.076691364), (-2.717136676, -1.174463735), (-1.131479784, -1.174463712)],
                knots=[3.079807634, 3.079807634, 3.079807634, 4.61274479, 4.61274479, 4.61274479], degree=2, weights=[1, 0.720364535, 1]))
            Line((-1.131479784, -1.174463712), (-1.037858761, -1.174463712))
            add(Edge.make_bspline(
                [(-1.037858761, -1.174463712), (-0.095057289, -1.174463712), (0.323240273, -0.533329339)],
                knots=[1.760260959, 1.760260959, 1.760260959, 2.798844261, 2.798844261, 2.798844261], degree=2, weights=[1, 0.868170926, 1]))
            ThreePointArc((0.323240273, -0.533329339), (0.396990367, -0.414226505), (0.455654338, -0.287013692))
            ThreePointArc((0.455654338, -0.287013692), (0.467247325, -0.238690378), (0.465485217, -0.189027163))
            ThreePointArc((0.465485217, -0.189027163), (0.453480667, -0.168104183), (0.430820669, -0.159833461))
            Line((0.430820669, -0.159833461), (-0.50048808, -0.159833461))
            ThreePointArc((-0.50048808, -0.159833461), (-0.53825591, -0.17183426), (-0.562169449, -0.203434431))
            add(Edge.make_bspline(
                [(-1.058661028, -0.574317984), (-0.693553117, -0.574677188), (-0.562169449, -0.203434431)],
                knots=[5.955155363, 5.955155363, 5.955155363, 7.020735544, 7.020735544, 7.020735544], degree=2, weights=[1, 0.86139323, 1]))
            add(Edge.make_bspline(
                [(-1.118454184, 0.858318186), (-1.740543918, 0.826860552), (-1.710558048, 0.108403064), (-1.680572179, -0.610054424), (-1.058661028, -0.574317984)],
                knots=[3.181025595, 3.181025595, 3.181025595, 4.754799698, 4.754799698, 6.328573801, 6.328573801, 6.328573801], degree=2, weights=[1, 0.706053195, 1, 0.706053195, 1]))
            add(Edge.make_bspline(
                [(-0.562169449, 0.490811684), (-0.70840827, 0.904029734), (-1.118454184, 0.858318186)],
                knots=[2.404042417, 2.404042417, 2.404042417, 3.565685694, 3.565685694, 3.565685694], degree=2, weights=[1, 0.83601209, 1]))
            ThreePointArc((-0.562169449, 0.490811684), (-0.538255894, 0.459211502), (-0.500488048, 0.447210694))
        make_face()
        with BuildLine():
            Line((2.807816498, 0.447210694), (3.743651591, 0.447210694))
            ThreePointArc((3.743651591, 0.447210694), (3.761961719, 0.45529852), (3.772895489, 0.472065344))
            ThreePointArc((3.772895489, 0.472065344), (3.776081943, 0.516057125), (3.76870693, 0.559543208))
            ThreePointArc((3.76870693, 0.559543208), (3.708259081, 0.692528449), (3.631544819, 0.816842321))
            add(Edge.make_bspline(
                [(3.631544819, 0.816842321), (3.213247267, 1.457976678), (2.270445819, 1.457976694)],
                knots=[0.342748392, 0.342748392, 0.342748392, 1.381331674, 1.381331674, 1.381331674], degree=2, weights=[1, 0.868170932, 1]))
            Line((2.270445819, 1.457976694), (2.176824731, 1.457976694))
            add(Edge.make_bspline(
                [(2.176824731, 1.457976694), (0.591167883, 1.457976694), (0.59116787, 0.206821629)],
                knots=[4.81203319, 4.81203319, 4.81203319, 6.344970318, 6.344970318, 6.344970318], degree=2, weights=[1, 0.720364545, 1]))
            Line((0.59116787, 0.206821629), (0.59116787, 0.076691364))
            add(Edge.make_bspline(
                [(0.59116787, 0.076691364), (0.59116787, -1.174463735), (2.176824762, -1.174463712)],
                knots=[3.079807634, 3.079807634, 3.079807634, 4.61274479, 4.61274479, 4.61274479], degree=2, weights=[1, 0.720364535, 1]))
            Line((2.176824762, -1.174463712), (2.270445785, -1.174463712))
            add(Edge.make_bspline(
                [(2.270445785, -1.174463712), (3.213247257, -1.174463712), (3.631544819, -0.533329339)],
                knots=[1.760260959, 1.760260959, 1.760260959, 2.798844261, 2.798844261, 2.798844261], degree=2, weights=[1, 0.868170926, 1]))
            ThreePointArc((3.631544819, -0.533329339), (3.705294913, -0.414226505), (3.763958884, -0.287013692))
            ThreePointArc((3.763958884, -0.287013692), (3.775551871, -0.238690378), (3.773789763, -0.189027163))
            ThreePointArc((3.773789763, -0.189027163), (3.761785213, -0.168104183), (3.739125215, -0.159833461))
            Line((3.739125215, -0.159833461), (2.807816466, -0.159833461))
            ThreePointArc((2.807816466, -0.159833461), (2.770048636, -0.17183426), (2.746135097, -0.203434431))
            add(Edge.make_bspline(
                [(2.249643518, -0.574317984), (2.614751429, -0.574677188), (2.746135097, -0.203434431)],
                knots=[5.955155363, 5.955155363, 5.955155363, 7.020735544, 7.020735544, 7.020735544], degree=2, weights=[1, 0.86139323, 1]))
            add(Edge.make_bspline(
                [(2.189850362, 0.858318186), (1.567760628, 0.826860552), (1.597746498, 0.108403064), (1.627732367, -0.610054424), (2.249643518, -0.574317984)],
                knots=[3.181025595, 3.181025595, 3.181025595, 4.754799698, 4.754799698, 6.328573801, 6.328573801, 6.328573801], degree=2, weights=[1, 0.706053195, 1, 0.706053195, 1]))
            add(Edge.make_bspline(
                [(2.746135097, 0.490811684), (2.599896276, 0.904029734), (2.189850362, 0.858318186)],
                knots=[2.404042417, 2.404042417, 2.404042417, 3.565685694, 3.565685694, 3.565685694], degree=2, weights=[1, 0.83601209, 1]))
            ThreePointArc((2.746135097, 0.490811684), (2.770048652, 0.459211502), (2.807816498, 0.447210694))
        make_face()
    extrude(amount=CUT_EXTRUDE3_DEPTH, mode=Mode.SUBTRACT)


solid = part.part
